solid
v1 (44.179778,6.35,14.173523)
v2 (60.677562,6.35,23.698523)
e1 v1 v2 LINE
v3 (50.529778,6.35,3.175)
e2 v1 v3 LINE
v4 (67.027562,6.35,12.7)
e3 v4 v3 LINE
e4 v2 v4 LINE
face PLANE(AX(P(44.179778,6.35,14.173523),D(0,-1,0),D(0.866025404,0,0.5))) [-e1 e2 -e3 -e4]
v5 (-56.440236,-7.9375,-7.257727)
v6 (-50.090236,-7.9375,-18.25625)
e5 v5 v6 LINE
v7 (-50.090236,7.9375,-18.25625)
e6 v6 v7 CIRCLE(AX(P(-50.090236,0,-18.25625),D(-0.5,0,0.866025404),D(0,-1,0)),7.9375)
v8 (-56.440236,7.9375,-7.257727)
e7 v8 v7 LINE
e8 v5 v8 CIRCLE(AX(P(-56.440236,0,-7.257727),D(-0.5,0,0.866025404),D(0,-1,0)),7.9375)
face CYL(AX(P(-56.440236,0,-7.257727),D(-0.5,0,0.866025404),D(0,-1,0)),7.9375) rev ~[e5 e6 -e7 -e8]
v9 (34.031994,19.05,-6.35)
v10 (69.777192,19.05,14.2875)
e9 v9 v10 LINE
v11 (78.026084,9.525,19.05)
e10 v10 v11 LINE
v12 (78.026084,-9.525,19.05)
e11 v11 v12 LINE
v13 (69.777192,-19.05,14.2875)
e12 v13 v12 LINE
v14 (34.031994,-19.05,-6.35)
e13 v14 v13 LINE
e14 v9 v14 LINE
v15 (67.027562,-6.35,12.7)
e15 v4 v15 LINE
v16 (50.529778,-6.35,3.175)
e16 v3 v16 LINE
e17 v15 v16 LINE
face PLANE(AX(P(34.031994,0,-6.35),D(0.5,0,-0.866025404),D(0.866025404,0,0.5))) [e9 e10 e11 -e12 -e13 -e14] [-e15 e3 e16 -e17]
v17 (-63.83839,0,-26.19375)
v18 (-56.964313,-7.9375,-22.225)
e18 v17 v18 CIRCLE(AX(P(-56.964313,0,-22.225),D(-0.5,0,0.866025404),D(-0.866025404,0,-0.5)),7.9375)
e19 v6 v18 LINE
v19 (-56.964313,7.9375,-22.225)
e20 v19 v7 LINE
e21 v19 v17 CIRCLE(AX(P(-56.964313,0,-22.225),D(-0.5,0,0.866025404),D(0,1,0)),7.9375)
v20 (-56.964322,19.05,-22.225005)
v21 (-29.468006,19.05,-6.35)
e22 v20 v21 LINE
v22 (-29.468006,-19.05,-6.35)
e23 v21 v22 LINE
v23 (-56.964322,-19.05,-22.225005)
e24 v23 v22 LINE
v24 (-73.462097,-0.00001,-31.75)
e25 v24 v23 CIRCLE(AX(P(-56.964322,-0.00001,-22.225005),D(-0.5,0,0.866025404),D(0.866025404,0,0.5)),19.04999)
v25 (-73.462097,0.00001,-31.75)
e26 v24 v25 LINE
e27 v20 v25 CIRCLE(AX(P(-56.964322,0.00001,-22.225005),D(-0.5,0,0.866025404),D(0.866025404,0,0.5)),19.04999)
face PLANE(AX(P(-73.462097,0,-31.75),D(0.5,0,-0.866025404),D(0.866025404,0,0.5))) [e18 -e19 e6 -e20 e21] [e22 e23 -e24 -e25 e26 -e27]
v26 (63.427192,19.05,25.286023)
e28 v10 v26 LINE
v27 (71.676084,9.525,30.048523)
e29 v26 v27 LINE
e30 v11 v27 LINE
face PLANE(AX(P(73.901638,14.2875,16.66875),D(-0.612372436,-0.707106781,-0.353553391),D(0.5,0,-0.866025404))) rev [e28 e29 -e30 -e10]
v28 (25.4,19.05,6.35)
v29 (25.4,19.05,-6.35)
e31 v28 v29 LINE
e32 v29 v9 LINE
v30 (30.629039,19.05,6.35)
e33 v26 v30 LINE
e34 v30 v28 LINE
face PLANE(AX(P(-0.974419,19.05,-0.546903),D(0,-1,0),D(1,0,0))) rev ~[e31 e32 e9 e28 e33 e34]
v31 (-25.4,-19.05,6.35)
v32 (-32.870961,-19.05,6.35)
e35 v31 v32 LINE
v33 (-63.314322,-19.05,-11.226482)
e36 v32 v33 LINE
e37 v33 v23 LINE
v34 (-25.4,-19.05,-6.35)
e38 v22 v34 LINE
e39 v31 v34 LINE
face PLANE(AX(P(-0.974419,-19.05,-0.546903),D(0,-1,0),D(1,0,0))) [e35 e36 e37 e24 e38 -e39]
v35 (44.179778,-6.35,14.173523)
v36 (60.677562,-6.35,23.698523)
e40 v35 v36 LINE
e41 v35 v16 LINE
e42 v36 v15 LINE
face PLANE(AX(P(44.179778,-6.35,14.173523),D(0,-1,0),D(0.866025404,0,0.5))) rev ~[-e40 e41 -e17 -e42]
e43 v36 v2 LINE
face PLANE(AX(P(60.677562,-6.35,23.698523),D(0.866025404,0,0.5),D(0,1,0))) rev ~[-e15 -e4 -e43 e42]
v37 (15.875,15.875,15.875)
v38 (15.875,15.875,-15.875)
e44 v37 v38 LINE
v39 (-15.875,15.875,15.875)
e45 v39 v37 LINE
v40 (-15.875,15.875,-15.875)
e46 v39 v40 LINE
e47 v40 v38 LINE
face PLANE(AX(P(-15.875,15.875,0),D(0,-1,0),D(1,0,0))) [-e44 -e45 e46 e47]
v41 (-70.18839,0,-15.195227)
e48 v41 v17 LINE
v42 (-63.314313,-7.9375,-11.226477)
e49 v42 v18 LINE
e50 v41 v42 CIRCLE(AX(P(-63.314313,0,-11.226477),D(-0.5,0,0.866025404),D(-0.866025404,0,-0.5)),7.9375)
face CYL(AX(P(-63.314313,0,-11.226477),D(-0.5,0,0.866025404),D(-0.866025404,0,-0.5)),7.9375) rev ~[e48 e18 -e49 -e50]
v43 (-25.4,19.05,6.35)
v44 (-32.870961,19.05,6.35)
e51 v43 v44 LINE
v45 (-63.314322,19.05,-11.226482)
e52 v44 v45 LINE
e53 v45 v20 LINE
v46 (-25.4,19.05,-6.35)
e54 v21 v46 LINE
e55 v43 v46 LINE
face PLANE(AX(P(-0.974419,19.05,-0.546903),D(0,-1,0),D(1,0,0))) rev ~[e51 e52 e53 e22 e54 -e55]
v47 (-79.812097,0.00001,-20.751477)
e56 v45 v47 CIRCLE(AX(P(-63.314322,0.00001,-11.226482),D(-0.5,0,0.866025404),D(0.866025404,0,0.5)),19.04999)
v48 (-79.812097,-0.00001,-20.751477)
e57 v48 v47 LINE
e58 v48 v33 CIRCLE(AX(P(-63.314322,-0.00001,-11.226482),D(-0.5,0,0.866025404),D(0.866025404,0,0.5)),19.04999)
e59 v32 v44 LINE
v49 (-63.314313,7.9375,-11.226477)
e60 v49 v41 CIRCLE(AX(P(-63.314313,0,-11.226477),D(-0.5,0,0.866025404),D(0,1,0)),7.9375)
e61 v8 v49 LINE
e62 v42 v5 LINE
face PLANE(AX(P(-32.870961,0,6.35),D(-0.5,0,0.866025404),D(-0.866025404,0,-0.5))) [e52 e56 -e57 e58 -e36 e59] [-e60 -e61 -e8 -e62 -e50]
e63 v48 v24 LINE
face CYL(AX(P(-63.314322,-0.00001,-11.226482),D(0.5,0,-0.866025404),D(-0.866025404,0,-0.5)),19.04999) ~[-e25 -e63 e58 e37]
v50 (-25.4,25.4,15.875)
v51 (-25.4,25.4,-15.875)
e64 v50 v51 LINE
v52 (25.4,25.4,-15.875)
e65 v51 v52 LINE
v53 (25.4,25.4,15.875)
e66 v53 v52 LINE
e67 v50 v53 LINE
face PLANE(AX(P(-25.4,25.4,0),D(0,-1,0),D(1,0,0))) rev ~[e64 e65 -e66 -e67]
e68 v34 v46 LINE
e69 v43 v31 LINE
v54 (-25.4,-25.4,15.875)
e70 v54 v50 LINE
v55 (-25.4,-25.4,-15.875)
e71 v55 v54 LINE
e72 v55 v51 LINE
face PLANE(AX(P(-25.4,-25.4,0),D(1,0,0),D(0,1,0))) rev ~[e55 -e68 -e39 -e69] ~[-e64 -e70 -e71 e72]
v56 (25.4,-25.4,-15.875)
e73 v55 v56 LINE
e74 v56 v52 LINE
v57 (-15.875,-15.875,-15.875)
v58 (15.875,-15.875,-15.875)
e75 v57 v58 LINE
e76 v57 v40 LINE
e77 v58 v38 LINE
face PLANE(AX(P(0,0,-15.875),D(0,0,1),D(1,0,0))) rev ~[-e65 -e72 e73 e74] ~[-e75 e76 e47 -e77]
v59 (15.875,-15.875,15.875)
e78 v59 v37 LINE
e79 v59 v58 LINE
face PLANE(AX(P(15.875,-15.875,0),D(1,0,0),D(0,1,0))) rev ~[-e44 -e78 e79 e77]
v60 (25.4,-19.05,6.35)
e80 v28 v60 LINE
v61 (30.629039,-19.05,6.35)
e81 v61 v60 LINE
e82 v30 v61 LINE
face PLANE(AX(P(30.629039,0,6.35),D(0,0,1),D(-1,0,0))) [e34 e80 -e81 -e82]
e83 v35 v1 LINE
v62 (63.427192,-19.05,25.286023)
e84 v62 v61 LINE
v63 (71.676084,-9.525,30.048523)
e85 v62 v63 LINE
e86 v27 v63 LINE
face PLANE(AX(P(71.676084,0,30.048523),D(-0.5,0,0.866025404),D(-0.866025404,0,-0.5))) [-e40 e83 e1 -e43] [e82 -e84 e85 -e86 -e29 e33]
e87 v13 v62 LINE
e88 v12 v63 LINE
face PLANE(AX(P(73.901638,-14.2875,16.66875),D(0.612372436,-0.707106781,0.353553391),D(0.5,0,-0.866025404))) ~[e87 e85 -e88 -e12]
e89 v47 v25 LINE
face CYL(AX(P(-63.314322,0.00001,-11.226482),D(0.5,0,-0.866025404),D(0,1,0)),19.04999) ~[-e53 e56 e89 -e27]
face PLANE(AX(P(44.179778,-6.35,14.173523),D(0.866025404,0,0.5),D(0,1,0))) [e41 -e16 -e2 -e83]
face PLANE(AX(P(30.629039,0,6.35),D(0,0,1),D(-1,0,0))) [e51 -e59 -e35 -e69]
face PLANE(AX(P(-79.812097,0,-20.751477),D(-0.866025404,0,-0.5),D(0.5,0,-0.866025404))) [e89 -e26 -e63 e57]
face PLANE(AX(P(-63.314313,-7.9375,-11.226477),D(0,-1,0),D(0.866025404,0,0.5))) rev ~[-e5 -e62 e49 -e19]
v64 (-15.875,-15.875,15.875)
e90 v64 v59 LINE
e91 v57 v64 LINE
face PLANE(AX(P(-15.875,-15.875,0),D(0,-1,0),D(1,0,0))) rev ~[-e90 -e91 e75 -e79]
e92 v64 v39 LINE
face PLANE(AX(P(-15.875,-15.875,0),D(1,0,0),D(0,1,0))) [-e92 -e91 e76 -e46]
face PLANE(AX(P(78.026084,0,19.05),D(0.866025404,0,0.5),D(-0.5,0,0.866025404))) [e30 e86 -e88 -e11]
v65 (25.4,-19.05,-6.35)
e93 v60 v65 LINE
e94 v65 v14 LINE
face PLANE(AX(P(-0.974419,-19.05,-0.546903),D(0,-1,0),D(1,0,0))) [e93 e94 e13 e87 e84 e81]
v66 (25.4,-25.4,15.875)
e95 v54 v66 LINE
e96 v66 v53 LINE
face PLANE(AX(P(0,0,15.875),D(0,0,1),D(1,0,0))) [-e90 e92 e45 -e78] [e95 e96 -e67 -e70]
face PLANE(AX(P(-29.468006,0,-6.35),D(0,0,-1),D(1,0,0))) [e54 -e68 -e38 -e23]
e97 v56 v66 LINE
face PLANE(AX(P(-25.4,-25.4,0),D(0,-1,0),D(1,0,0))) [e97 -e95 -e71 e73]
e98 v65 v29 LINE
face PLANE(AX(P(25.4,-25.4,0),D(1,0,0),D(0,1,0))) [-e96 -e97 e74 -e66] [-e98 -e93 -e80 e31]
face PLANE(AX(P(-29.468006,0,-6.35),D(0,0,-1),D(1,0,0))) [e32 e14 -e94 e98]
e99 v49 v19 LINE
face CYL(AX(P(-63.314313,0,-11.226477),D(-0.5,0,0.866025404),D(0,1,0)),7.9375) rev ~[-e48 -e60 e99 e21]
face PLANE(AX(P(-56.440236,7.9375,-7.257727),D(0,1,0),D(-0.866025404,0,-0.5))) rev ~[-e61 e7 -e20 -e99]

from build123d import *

# Parameters (mm, degrees)
F0_W      = 50.8
F0_H      = 50.8
F0_W_2    = 31.75
F0_H_2    = 31.75
F1_DEPTH  = 15.875
F3_DEPTH  = 19.05
F5_DEPTH  = 25.4
F6_R      = 19.04999
F7_W      = 19.05
F7_H      = 12.7
F8_DEPTH  = 56.6950905122
F9_SIZE   = 9.525
F10_DEPTH = 38.101


# Not quite as in the source:
# - a fillet or chamfer is up to 0.001 mm smaller than in the source, because OpenCascade refuses the exact size


with BuildPart() as f1:
    # F0 (on Top) → F1 (new body, symmetric)
    with BuildSketch(Plane.XY):
        Rectangle(F0_W, F0_H)
        Rectangle(F0_W_2, F0_H_2, mode=Mode.SUBTRACT)
    extrude(amount=F1_DEPTH, both=True)

    # F2 (on Front) → F3 (join, symmetric)
    with BuildSketch(Plane.XZ):
        Polygon((-73.4620968847, -31.75), (-29.4680063725, -6.35), (34.0319936275, -6.35), (78.0260841398, 19.05), (71.6760841398, 30.0485226281), (30.6290388837, 6.35), (-32.8709611163, 6.35), (-79.8120968847, -20.7514773719), align=None)
    extrude(amount=F3_DEPTH, both=True)

    # F4 (on face) → F5 (cut)
    with BuildSketch(Plane(origin=(-10.9673709361, 0, 18.9960436868), x_dir=(0.8660254038, 0, 0.5), z_dir=(-0.5, 0, 0.8660254038))):
        with BuildLine():
            Line((-52.5075421174, 7.9375), (-60.4450421174, 7.9375))
            ThreePointArc((-60.4450421174, 7.9375), (-66.0577021931, 5.6126600757), (-68.3825421174, 0))
            ThreePointArc((-68.3825421174, 0), (-66.0577021931, -5.6126600757), (-60.4450421174, -7.9375))
            Line((-60.4450421174, -7.9375), (-52.5075421174, -7.9375))
            ThreePointArc((-52.5075421174, -7.9375), (-44.5700421174, 0), (-52.5075421174, 7.9375))
        make_face()
    extrude(amount=-F5_DEPTH, mode=Mode.SUBTRACT)

    # F6 (radius 19.05 in the source; OpenCascade refuses exactly that, so slightly less here)
    f6_edges = [f1.edges().sort_by_distance(p)[0] for p in [
        (-76.637097, -19.05, -26.250739),
        (-76.637097, 19.05, -26.250739),
    ]]
    fillet(f6_edges, radius=F6_R)

    # F7 (on face) → F8 (cut, through all)
    with BuildSketch(Plane(origin=(4.9076290639, 0, -8.5002628834), x_dir=(0.8660254038, 0, 0.5), z_dir=(-0.5, 0, 0.8660254038))):
        with Locations((54.8725710229, 0)):
            Rectangle(F7_W, F7_H)
    extrude(amount=-F8_DEPTH, mode=Mode.SUBTRACT)

    # F9
    f9_edges = [f1.edges().sort_by_distance(p)[0] for p in [
        (74.851084, 19.05, 24.549261),
        (74.851084, -19.05, 24.549261),
    ]]
    chamfer(f9_edges, length=F9_SIZE)

    # F10 (cut, through all): a face of the model
    f10_faces = [f1.faces().sort_by_distance(p)[0] for p in [
        (0, 0, 6.35),
    ]]
    extrude(f10_faces, amount=-F10_DEPTH, mode=Mode.SUBTRACT)


solid = f1.part
